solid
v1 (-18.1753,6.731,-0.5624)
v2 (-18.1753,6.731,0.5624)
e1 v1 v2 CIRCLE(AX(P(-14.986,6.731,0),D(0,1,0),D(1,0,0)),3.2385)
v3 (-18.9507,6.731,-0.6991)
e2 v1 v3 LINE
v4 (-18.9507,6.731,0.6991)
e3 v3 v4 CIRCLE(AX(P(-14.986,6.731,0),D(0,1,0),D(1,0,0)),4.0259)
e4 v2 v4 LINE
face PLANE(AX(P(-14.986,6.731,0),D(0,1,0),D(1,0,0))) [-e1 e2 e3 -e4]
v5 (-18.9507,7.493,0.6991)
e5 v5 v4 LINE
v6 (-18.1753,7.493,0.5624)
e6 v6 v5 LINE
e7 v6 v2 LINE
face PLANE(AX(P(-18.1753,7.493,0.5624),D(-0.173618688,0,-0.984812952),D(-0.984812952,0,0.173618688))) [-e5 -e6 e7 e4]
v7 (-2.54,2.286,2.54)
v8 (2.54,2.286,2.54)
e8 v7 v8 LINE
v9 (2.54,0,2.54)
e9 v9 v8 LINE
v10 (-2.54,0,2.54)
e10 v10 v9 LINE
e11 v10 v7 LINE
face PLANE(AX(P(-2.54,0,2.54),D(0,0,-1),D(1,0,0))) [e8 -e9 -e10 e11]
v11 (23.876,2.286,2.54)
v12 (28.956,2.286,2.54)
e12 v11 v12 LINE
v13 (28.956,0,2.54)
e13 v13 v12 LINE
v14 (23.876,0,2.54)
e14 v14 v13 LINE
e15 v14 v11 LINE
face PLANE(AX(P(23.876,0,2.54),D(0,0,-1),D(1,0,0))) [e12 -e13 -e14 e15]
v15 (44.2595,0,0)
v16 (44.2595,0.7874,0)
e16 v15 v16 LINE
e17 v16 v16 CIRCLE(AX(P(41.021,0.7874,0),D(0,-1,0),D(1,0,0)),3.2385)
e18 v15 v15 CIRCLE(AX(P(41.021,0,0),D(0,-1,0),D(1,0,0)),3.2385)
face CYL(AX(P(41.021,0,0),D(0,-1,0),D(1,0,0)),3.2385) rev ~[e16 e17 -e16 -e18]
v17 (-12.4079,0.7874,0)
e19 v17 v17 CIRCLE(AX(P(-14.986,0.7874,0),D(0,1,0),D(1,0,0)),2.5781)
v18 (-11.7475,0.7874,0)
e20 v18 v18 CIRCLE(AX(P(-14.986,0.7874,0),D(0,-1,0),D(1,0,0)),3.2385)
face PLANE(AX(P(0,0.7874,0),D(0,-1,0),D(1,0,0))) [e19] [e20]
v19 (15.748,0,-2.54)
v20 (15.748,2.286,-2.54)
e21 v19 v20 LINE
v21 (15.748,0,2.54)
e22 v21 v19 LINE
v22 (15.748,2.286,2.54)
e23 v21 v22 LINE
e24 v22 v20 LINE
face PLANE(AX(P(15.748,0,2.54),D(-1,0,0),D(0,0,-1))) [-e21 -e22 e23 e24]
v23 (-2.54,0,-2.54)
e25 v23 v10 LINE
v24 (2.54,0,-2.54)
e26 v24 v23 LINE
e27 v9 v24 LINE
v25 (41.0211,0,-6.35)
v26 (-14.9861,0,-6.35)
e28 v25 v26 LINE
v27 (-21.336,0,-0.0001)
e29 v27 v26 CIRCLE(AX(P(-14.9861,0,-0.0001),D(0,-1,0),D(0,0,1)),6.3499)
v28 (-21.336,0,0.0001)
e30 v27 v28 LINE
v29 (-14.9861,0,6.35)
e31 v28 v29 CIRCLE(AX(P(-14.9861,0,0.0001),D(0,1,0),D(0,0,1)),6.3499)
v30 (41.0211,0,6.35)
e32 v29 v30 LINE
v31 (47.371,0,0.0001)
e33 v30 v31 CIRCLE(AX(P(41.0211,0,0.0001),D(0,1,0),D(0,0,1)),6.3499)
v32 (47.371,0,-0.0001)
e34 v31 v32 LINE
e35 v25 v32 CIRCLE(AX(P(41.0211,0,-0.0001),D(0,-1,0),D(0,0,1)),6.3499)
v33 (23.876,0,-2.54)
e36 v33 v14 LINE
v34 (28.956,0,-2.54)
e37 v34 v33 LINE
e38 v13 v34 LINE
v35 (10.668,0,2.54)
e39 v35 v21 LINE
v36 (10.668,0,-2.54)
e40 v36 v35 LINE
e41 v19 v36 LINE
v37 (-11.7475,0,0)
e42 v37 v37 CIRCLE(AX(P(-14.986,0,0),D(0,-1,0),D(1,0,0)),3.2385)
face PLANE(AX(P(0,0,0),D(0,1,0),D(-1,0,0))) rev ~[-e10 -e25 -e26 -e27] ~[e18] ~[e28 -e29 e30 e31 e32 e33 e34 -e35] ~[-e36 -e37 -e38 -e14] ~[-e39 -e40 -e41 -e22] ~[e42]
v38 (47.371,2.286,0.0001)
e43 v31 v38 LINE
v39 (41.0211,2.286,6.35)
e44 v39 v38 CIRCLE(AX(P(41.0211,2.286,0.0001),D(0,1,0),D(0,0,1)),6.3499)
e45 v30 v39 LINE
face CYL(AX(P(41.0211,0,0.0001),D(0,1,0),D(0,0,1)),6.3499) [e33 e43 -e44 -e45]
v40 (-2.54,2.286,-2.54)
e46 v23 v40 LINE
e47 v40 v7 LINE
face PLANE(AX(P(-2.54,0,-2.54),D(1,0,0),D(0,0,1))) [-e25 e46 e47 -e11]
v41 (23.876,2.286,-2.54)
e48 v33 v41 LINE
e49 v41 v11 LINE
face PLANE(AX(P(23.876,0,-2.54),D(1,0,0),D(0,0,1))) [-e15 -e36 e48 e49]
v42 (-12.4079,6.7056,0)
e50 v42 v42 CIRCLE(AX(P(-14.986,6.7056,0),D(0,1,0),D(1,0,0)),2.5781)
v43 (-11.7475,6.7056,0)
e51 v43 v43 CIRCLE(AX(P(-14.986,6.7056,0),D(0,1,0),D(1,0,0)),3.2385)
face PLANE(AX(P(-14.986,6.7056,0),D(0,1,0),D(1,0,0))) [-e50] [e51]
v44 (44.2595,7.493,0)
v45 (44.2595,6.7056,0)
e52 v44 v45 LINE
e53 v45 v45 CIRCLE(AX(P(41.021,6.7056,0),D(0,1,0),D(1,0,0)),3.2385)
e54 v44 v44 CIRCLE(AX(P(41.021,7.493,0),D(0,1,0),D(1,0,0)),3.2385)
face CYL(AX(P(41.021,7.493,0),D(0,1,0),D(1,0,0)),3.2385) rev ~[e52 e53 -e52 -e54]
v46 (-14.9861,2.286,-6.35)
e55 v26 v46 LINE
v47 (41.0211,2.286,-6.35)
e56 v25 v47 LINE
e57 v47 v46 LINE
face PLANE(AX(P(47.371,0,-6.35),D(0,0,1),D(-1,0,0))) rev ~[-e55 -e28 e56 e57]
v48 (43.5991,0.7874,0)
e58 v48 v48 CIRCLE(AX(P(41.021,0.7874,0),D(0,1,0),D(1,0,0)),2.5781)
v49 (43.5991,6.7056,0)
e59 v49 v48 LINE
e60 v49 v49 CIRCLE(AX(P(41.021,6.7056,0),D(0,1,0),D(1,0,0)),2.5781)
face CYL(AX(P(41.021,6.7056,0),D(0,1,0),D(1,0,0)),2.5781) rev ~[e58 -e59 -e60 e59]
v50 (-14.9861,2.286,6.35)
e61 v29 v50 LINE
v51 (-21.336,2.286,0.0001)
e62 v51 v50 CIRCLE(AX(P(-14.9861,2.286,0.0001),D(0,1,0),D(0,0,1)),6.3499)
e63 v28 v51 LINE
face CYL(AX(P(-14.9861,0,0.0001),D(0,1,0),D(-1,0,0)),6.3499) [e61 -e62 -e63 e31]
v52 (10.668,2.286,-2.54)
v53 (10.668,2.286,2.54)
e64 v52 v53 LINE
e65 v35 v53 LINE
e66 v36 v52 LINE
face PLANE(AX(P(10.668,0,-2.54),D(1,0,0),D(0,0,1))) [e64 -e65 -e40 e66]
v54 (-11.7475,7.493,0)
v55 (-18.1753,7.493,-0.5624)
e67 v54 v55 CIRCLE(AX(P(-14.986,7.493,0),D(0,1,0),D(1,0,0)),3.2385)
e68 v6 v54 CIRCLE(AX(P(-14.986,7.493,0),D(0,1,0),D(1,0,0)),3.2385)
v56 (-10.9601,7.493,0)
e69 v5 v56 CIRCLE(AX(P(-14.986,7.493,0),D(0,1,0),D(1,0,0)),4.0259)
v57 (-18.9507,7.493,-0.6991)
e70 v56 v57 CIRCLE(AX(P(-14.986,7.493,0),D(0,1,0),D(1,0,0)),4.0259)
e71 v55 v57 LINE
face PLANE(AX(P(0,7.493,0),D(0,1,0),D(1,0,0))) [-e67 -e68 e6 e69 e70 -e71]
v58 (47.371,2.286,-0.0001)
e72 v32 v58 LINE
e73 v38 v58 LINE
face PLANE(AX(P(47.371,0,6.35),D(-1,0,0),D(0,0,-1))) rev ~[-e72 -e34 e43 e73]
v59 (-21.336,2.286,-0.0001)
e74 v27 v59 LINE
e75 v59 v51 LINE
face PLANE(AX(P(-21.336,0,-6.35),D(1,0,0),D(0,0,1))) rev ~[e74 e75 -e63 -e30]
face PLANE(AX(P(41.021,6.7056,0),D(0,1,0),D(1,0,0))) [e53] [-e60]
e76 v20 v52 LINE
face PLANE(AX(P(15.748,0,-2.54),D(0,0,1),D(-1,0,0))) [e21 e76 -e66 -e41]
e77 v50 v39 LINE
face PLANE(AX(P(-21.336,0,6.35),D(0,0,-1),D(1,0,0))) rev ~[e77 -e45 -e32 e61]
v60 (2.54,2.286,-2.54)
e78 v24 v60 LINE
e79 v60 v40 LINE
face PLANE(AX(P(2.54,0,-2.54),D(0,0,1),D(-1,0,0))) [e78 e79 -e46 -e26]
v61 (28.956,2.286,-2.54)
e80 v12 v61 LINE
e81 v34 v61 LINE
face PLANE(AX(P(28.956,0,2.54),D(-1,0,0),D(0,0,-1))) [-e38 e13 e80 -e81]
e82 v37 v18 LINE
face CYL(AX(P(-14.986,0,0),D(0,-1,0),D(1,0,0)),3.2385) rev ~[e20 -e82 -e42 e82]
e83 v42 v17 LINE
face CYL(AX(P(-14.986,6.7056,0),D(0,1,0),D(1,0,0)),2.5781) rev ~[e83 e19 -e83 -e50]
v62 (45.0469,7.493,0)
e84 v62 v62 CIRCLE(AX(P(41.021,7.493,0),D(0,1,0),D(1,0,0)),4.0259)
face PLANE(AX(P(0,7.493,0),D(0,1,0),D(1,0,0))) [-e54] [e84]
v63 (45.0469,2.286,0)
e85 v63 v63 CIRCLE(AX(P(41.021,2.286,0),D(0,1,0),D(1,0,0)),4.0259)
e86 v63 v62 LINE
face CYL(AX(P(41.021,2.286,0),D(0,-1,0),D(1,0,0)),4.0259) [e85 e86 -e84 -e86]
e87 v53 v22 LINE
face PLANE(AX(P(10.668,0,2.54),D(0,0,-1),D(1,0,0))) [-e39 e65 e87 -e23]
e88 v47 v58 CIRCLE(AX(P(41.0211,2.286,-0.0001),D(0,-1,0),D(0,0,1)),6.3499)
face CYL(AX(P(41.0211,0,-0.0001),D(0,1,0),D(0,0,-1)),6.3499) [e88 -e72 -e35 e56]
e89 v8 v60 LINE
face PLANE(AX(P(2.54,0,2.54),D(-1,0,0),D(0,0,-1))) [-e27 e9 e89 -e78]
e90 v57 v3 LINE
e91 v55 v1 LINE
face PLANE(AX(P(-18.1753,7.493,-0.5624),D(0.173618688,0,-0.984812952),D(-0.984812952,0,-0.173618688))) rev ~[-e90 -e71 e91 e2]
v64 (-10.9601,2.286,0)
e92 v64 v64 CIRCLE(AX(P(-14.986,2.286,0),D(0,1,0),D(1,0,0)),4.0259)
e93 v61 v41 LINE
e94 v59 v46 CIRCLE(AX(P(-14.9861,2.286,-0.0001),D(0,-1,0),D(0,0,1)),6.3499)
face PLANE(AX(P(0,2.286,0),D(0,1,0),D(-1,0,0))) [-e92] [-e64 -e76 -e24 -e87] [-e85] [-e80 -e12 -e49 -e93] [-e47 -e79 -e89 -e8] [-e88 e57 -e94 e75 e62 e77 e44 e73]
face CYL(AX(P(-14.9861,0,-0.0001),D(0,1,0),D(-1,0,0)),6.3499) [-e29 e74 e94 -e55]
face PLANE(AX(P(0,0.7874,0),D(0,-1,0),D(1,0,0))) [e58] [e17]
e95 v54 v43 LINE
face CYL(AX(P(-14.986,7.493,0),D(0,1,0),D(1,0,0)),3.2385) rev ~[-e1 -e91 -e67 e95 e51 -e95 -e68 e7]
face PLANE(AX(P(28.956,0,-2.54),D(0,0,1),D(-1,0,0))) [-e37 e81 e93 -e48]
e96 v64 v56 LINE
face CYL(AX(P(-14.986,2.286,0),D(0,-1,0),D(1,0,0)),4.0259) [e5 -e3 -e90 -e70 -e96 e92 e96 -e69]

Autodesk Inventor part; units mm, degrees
ref_plane "YZ Plane" through (0, 0, 0) normal (1, 0, 0) x (0, 1, 0)
ref_plane "XZ Plane" through (0, 0, 0) normal (0, 1, 0) x (-1, 0, 0)
ref_plane "XY Plane" through (0, 0, 0) normal (0, 0, 1) x (1, 0, 0)
sketch "Sketch1" plane through (0, 0, 0) normal (0, 1, 0) x (-1, 0, 0)
  line L0 (21.336, 6.35) -> (-47.371, 6.35)
  line L1 (-47.371, 6.35) -> (-47.371, -6.35)
  line L2 (-47.371, -6.35) -> (21.336, -6.35)
  line L3 (21.336, -6.35) -> (21.336, 6.35)
  line L4 (-2.54, -2.54) -> (2.54, -2.54)
  line L5 (2.54, -2.54) -> (2.54, 2.54)
  line L6 (2.54, 2.54) -> (-2.54, 2.54)
  line L7 (-2.54, 2.54) -> (-2.54, -2.54)
  line L8 (-2.54, -2.54) -> (2.54, 2.54) construction
  line L9 (2.54, -2.54) -> (-2.54, 2.54) construction
  line L10 (-10.668, 2.54) -> (-15.748, 2.54)
  line L11 (-15.748, 2.54) -> (-15.748, -2.54)
  line L12 (-15.748, -2.54) -> (-10.668, -2.54)
  line L13 (-10.668, -2.54) -> (-10.668, 2.54)
  line L14 (-10.668, 2.54) -> (-15.748, -2.54) construction
  line L15 (-15.748, 2.54) -> (-10.668, -2.54) construction
  line L16 (-23.876, 2.54) -> (-28.956, 2.54)
  line L17 (-28.956, 2.54) -> (-28.956, -2.54)
  line L18 (-28.956, -2.54) -> (-23.876, -2.54)
  line L19 (-23.876, -2.54) -> (-23.876, 2.54)
  line L20 (-23.876, 2.54) -> (-28.956, -2.54) construction
  line L21 (-28.956, 2.54) -> (-23.876, -2.54) construction
  point P0 (0, 0)
  point P1 (-13.208, 0)
  point P2 (-26.416, 0)
  dimension "d0" = 68.707
  dimension "d1" = 12.7
  dimension "d2" = 5.08
  dimension "d3" = 5.08
  dimension "d4" = 5.08
  dimension "d5" = 5.08
  dimension "d6" = 13.208
  dimension "d7" = 13.208
  dimension "d8" = 6.35
  dimension "d9" = 21.336
  dimension "d37" = 5.08
  dimension "d38" = 5.08
extrude "Extrusion1" add sketch "Sketch1" along normal blind 2.286
sketch "Sketch2" plane through (0, 2.286, 0) normal (0, 1, 0) x (1, 0, 0)
  line L0 (-21.336, 6.35) -> (-21.336, -6.35) projected
  circle A0 centre (-14.986, 0) radius 4.0259
  point P0 (0, 0)
  dimension "d12" = 6.35
  dimension "d13" = 8.0518
extrude "Extrusion2" add sketch "Sketch2" along normal blind 5.207
sketch "Sketch3" plane through (-14.986, 7.493, 0) normal (0, 1, 0) x (1, 0, 0)
  circle A0 centre (0, 0) radius 3.2385
  point P0 (14.986, 0)
  dimension "d16" = 6.477
extrude "Extrusion3" cut sketch "Sketch3" against normal blind 0.7874
sketch "Sketch4" plane through (0, 0, 0) normal (0, -1, 0) x (1, 0, 0)
  circle A0 centre (-14.986, 0) radius 3.2385 projected
  circle A1 centre (-14.986, 0) radius 3.2385
  point P0 (0, 0)
  dimension "d39" = 6.477
extrude "Extrusion4" cut sketch "Sketch4" against normal blind 0.7874
sketch "Sketch5" plane through (-14.986, 6.7056, 0) normal (0, 1, 0) x (1, 0, 0)
  circle A0 centre (0, 0) radius 2.5781
  point P0 (14.986, 0)
  dimension "d21" = 5.1562
extrude "Extrusion5" cut sketch "Sketch5" against normal through all
sketch "Sketch6" plane through (0, 2.286, 0) normal (0, 1, 0) x (1, 0, 0)
  line L0 (47.371, -6.35) -> (47.371, 6.35) projected
  circle A0 centre (41.021, 0) radius 4.0259
  point P0 (0, 0)
  dimension "d24" = 6.35
  dimension "d25" = 8.0518
extrude "Extrusion6" add sketch "Sketch6" along normal blind 5.207
sketch "Sketch7" plane through (41.021, 7.493, 0) normal (0, 1, 0) x (1, 0, 0)
  circle A0 centre (0, 0) radius 3.2385
  point P0 (-41.021, 0)
  dimension "d28" = 6.477
extrude "Extrusion7" cut sketch "Sketch7" against normal blind 0.7874
sketch "Sketch8" plane through (0, 0, 0) normal (0, -1, 0) x (1, 0, 0)
  circle A0 centre (41.021, 0) radius 3.2385 projected
  circle A1 centre (41.021, 0) radius 3.2385
  point P0 (0, 0)
  dimension "d40" = 6.477
extrude "Extrusion8" cut sketch "Sketch8" against normal blind 0.7874
sketch "Sketch9" plane through (41.021, 6.7056, 0) normal (0, 1, 0) x (1, 0, 0)
  circle A0 centre (0, 0) radius 2.5781
  point P0 (-41.021, 0)
  dimension "d33" = 5.1562
extrude "Extrusion9" cut sketch "Sketch9" against normal through all
fillet "Fillet1" radius 6.35 4 edges at (47.371, 1.143, 6.35) (47.371, 1.143, -6.35) (-21.336, 1.143, 6.35) (-21.336, 1.143, -6.35)
sketch "Sketch12" plane through (-14.986, 7.493, 0) normal (0, 1, 0) x (1, 0, 0)
  circle A0 centre (0, 0) radius 4.0259 projected
  line L0 (0, 0) -> (4.0259, 0) construction
  line L1 (0, 0) -> (4.0259, 0) construction
  circle A1 centre (0, 0) radius 3.2385 projected
  line L2 (-3.1893, 0.5624) -> (-3.9647, 0.6991)
  line L3 (-3.1893, -0.5624) -> (-3.9647, -0.6991)
  arc A2 (-3.1893, 0.5624) -> (-3.1893, -0.5624) centre (0, 0) ccw
  arc A3 (-3.9647, 0.6991) -> (-3.9647, -0.6991) centre (0, 0) ccw
  point P0 (14.986, 0)
  point P1 (-2.9392, 0.5183)
extrude "Extrusion11" cut sketch "Sketch12" against normal blind 0.762 contours L2 A1 L3 A0 picked at (-3.7571, 0.0628)
properties part number "VexLegoMountThick2"
